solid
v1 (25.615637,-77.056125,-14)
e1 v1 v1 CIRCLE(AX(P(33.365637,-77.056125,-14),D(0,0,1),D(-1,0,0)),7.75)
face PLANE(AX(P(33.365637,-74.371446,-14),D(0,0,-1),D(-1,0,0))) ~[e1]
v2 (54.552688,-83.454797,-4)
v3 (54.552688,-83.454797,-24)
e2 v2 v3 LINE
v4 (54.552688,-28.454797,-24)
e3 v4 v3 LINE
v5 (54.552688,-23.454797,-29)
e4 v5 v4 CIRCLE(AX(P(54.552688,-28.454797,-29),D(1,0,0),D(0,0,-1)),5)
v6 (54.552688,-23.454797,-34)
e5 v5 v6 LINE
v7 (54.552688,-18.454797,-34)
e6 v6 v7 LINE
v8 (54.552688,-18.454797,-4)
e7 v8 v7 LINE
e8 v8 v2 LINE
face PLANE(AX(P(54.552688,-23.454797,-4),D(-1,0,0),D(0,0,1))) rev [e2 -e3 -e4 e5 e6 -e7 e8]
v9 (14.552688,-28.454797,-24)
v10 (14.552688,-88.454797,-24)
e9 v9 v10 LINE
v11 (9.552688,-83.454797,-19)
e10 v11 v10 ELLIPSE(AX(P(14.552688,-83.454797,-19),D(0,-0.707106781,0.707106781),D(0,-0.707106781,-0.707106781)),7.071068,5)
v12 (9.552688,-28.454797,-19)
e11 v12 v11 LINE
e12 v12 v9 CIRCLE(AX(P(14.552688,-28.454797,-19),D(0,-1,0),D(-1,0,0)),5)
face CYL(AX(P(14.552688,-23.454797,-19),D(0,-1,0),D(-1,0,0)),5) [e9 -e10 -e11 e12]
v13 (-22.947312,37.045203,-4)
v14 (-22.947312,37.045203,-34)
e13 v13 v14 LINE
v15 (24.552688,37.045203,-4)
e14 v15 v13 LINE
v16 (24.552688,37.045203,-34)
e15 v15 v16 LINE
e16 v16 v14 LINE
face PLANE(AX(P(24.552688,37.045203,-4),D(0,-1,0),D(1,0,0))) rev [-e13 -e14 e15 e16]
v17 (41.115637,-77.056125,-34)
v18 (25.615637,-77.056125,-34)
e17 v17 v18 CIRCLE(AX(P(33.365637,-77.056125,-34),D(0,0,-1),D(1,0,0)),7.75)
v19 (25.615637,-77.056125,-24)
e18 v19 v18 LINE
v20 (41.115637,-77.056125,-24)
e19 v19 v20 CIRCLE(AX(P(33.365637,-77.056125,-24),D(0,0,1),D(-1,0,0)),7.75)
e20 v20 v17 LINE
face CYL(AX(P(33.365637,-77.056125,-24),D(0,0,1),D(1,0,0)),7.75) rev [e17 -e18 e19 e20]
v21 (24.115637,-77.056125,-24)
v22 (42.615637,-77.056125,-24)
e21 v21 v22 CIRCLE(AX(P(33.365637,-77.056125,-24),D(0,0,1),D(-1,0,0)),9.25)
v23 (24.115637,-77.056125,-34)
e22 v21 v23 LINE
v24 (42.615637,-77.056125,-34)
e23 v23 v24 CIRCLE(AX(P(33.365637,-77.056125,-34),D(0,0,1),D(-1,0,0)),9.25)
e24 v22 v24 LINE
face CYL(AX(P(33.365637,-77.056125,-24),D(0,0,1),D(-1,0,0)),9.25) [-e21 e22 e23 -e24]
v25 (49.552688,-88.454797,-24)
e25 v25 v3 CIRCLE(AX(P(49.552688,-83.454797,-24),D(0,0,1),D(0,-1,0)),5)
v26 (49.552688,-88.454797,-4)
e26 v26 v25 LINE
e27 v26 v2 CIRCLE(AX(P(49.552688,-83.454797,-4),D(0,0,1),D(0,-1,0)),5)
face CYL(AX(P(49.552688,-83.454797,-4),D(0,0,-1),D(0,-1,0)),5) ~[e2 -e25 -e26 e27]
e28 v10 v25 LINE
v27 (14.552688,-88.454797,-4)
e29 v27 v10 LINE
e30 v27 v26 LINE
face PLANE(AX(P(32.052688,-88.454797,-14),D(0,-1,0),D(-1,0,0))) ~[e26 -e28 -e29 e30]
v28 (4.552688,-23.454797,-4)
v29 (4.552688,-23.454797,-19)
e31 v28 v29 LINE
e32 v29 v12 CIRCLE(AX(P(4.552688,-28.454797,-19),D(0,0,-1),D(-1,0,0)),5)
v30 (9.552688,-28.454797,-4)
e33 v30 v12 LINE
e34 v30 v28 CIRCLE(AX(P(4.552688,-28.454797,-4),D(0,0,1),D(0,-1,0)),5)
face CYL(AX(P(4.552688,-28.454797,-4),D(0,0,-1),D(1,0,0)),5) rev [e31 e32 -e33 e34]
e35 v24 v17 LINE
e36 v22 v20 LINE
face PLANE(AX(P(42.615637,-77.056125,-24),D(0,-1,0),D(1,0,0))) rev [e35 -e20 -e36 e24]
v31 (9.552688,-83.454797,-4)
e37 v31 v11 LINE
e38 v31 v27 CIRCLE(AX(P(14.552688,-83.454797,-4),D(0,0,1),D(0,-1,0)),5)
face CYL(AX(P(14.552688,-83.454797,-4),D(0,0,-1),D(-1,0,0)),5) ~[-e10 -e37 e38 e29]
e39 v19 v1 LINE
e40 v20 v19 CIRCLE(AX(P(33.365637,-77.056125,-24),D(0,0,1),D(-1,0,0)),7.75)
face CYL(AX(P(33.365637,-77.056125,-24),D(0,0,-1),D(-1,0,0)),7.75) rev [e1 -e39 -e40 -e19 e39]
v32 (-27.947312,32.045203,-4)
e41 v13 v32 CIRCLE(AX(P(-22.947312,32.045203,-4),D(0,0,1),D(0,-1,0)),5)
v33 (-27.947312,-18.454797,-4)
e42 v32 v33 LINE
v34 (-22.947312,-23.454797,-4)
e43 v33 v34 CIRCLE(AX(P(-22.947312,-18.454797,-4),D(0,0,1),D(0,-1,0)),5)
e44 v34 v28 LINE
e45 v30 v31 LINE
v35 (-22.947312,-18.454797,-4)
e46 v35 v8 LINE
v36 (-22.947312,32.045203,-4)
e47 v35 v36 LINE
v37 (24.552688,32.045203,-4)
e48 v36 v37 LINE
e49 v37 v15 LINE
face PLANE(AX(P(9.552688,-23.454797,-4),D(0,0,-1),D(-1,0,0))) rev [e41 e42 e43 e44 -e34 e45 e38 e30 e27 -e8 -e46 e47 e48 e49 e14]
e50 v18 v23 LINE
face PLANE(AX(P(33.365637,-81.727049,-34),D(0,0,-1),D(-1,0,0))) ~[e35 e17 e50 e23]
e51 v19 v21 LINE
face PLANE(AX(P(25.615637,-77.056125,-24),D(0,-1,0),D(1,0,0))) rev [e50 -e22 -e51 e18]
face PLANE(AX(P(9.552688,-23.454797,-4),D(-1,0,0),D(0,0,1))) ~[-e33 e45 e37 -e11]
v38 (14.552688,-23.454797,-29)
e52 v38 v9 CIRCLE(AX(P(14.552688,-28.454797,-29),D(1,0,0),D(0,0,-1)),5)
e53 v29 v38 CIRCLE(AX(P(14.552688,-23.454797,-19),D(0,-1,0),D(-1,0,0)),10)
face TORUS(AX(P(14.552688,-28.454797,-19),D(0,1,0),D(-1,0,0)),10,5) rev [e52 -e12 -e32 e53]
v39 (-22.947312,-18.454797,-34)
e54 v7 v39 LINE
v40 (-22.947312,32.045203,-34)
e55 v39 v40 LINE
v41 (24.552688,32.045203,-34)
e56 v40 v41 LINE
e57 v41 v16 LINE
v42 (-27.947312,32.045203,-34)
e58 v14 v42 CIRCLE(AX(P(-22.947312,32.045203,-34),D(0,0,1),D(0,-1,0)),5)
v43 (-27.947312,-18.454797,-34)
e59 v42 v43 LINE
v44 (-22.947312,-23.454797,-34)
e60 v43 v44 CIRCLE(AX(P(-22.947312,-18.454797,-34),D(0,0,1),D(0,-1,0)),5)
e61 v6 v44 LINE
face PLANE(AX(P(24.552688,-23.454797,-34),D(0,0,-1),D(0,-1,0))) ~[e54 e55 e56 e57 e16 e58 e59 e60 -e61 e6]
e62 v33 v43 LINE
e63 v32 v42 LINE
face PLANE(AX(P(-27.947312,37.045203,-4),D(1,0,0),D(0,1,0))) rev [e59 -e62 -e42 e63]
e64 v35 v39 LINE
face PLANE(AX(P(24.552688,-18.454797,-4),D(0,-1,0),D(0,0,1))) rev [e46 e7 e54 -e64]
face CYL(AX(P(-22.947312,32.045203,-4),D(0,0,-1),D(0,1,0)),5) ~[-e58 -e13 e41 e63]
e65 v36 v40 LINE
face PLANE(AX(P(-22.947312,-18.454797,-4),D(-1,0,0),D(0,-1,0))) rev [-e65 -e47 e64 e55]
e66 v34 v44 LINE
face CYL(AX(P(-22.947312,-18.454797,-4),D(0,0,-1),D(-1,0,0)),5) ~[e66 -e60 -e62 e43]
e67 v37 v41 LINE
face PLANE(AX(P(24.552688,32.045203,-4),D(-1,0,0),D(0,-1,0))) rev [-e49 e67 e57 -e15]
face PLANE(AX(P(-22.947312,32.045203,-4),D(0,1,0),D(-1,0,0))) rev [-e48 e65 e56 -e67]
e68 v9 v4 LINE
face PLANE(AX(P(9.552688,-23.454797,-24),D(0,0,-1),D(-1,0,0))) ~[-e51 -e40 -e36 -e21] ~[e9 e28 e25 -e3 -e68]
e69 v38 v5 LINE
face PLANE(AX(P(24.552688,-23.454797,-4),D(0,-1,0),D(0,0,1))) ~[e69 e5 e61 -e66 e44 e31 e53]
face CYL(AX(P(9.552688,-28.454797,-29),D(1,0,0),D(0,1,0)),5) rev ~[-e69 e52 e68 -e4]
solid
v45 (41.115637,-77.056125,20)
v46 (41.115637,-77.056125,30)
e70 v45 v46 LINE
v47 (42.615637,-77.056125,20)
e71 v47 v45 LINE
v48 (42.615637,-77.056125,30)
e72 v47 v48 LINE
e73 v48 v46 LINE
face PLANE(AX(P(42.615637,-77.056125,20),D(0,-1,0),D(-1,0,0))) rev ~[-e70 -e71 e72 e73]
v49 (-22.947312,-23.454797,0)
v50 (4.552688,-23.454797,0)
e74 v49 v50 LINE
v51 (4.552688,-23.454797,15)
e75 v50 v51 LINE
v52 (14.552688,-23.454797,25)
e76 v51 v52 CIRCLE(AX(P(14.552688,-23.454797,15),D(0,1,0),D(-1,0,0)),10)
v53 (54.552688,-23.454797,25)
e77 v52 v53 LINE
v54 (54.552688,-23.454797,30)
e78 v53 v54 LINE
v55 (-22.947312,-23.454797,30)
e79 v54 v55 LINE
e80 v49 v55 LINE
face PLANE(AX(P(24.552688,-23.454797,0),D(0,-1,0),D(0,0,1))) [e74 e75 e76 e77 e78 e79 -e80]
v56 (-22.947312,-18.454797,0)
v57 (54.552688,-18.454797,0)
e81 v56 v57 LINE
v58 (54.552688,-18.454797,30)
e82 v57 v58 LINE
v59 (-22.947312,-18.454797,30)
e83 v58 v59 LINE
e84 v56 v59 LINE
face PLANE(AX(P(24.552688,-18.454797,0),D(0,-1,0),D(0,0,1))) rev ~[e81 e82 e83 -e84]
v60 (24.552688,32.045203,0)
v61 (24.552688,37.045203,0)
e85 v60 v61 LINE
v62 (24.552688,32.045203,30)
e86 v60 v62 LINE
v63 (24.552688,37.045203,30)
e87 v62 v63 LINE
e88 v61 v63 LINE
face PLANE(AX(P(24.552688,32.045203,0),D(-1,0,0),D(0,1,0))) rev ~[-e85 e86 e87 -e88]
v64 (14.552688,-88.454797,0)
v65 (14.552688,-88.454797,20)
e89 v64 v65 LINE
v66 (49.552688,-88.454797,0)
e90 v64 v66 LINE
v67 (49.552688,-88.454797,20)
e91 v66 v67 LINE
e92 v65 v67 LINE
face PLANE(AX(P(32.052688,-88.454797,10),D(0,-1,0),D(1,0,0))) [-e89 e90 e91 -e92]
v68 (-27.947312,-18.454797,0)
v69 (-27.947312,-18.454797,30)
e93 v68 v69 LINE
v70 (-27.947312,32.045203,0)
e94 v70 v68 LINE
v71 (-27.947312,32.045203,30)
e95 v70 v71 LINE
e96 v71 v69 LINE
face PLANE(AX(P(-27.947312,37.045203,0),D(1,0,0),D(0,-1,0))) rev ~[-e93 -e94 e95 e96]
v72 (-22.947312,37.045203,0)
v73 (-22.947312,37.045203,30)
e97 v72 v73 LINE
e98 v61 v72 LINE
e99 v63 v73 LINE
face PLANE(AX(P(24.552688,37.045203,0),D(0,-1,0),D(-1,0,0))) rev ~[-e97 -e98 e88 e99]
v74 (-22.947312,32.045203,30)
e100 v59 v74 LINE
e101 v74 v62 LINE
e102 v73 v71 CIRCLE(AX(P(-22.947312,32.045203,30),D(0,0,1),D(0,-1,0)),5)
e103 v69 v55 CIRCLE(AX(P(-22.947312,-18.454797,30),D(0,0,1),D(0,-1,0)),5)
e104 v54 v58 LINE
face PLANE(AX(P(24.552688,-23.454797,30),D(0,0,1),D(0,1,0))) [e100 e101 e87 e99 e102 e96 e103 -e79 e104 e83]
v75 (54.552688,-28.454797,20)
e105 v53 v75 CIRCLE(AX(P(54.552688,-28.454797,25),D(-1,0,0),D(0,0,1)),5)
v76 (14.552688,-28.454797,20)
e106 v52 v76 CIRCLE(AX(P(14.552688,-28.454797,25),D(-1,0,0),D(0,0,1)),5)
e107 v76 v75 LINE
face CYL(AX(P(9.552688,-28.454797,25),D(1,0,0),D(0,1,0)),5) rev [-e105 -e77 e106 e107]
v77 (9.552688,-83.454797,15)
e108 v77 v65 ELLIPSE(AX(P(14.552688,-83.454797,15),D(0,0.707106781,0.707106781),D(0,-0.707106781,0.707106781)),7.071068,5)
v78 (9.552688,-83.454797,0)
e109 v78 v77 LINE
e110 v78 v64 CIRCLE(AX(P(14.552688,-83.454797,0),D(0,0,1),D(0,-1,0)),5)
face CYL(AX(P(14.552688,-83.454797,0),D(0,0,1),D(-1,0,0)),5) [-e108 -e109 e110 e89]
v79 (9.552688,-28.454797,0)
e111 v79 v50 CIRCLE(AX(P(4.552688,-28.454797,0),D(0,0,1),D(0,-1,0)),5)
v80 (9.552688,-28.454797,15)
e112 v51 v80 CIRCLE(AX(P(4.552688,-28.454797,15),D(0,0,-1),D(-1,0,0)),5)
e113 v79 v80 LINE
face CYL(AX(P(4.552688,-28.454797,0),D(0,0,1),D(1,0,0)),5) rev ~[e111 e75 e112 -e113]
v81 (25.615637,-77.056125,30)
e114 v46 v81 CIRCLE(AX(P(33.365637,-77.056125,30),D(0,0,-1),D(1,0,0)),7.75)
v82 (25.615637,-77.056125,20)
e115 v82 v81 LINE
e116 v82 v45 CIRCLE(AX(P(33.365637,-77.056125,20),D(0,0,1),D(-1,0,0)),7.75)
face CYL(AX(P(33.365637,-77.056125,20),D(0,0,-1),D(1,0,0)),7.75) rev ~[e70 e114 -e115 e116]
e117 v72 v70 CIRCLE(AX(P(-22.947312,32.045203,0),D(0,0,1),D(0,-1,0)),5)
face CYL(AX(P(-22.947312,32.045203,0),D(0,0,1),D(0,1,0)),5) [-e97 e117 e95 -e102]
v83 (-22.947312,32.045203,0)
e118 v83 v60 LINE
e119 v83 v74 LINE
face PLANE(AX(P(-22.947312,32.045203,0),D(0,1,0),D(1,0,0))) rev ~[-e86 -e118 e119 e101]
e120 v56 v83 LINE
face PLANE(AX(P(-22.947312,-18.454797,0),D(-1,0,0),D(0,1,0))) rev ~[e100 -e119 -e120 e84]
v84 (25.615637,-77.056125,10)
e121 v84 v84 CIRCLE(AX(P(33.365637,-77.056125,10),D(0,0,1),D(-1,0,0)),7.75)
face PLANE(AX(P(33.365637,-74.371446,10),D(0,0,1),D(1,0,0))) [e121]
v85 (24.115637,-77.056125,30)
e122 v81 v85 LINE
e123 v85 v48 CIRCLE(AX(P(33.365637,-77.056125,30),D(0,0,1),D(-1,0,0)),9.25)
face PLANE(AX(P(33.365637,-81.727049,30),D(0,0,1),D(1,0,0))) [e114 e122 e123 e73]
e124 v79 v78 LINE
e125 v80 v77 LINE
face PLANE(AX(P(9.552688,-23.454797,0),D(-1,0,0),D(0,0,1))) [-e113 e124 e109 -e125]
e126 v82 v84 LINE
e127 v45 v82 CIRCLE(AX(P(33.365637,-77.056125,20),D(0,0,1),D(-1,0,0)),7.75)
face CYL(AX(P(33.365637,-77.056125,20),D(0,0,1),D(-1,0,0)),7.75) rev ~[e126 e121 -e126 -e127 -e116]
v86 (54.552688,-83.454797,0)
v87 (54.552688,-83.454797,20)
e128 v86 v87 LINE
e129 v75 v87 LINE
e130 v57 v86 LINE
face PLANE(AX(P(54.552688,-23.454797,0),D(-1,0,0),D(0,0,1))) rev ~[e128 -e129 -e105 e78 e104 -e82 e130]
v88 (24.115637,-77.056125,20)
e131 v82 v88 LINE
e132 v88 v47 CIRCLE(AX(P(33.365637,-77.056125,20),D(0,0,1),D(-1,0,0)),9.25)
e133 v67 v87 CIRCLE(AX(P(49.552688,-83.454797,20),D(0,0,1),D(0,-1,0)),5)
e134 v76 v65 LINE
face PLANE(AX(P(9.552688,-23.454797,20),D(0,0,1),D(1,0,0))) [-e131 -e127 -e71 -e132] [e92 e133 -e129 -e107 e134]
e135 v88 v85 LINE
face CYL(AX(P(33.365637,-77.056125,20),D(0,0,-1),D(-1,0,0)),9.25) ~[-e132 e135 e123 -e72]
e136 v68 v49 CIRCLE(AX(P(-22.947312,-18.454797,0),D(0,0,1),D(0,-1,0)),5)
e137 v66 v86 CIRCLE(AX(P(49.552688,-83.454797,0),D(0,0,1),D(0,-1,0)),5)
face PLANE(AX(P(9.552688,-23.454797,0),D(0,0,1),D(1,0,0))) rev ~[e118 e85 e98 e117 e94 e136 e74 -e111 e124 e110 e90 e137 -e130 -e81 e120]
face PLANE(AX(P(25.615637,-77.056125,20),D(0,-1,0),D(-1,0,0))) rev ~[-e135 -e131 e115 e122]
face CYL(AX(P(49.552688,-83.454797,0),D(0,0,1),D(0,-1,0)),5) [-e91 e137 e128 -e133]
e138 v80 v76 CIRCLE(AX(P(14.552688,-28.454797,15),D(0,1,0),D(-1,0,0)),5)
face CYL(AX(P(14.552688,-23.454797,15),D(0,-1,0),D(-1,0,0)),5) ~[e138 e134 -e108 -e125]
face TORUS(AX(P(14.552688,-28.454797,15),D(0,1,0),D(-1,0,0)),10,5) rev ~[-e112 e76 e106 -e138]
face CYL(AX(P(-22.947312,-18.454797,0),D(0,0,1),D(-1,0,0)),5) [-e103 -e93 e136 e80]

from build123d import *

# Parameters (mm, degrees)
F1_DEPTH  = 30
F2_DEPTH  = 30
F3_W      = 45
F3_H      = 20
F4_DEPTH  = 65
F5_R      = 5
F9_DEPTH  = 10
F10_DEPTH = 10


with BuildPart() as f1:
    # F0 (on Top) → F1 (new body)
    with BuildSketch(Plane.XY):
        Polygon((24.5526876748, 37.0452034771), (-27.9473123252, 37.0452034771), (-27.9473123252, -23.4547965229), (24.5526876748, -23.4547965229), (24.5526876748, -18.4547965229), (19.5526876748, -18.4547965229), (-22.9473123252, -18.4547965229), (-22.9473123252, 32.0452034771), (19.5526876748, 32.0452034771), (24.5526876748, 32.0452034771), align=None)
    extrude(amount=F1_DEPTH)

    # F2 (add): a face of the model
    f2_faces = [f1.faces().sort_by_distance(p)[0] for p in [
        (24.5526876748, -20.9547965229, 15),
    ]]
    extrude(f2_faces, amount=F2_DEPTH)

    # F3 (on face) → F4 (join)
    with BuildSketch(Plane.XZ.offset(23.4547965229)):
        with Locations((32.0526876748, 10)):
            Rectangle(F3_W, F3_H)
    extrude(amount=F4_DEPTH)

    # F5
    f5_edges = [f1.edges().sort_by_distance(p)[0] for p in [
        (-27.947312, -23.454797, 15),
        (9.552688, -55.954797, 20),
        (9.552688, -88.454797, 10),
        (54.552688, -88.454797, 10),
        (-27.947312, 37.045203, 15),
        (9.552688, -23.454797, 10),
        (32.052688, -23.454797, 20),
    ]]
    fillet(f5_edges, radius=F5_R)


with BuildPart() as f7_1:
    # F7: instance of F1
    add(f1.part.mirror(Plane.XY.offset(-2)))


with BuildPart() as f1_1:
    add(f1.part)

    # F8 (on face) → F9 (cut)
    with BuildSketch(Plane.XY.offset(20)):
        with BuildLine():
            Line((33.365637064, -77.0561248064), (41.115637064, -77.0561248064))
            ThreePointArc((41.115637064, -77.0561248064), (33.365637064, -69.3061248064), (25.615637064, -77.0561248064))
            Line((25.615637064, -77.0561248064), (33.365637064, -77.0561248064))
        make_face()
        with BuildLine():
            ThreePointArc((25.615637064, -77.0561248064), (33.365637064, -84.8061248064), (41.115637064, -77.0561248064))
            Line((41.115637064, -77.0561248064), (33.365637064, -77.0561248064))
            Line((33.365637064, -77.0561248064), (25.615637064, -77.0561248064))
        make_face()
    extrude(amount=-F9_DEPTH, mode=Mode.SUBTRACT)

    # F8 (on face) → F10 (join)
    with BuildSketch(Plane.XY.offset(20)):
        with BuildLine():
            Line((42.615637064, -77.0561248064), (41.115637064, -77.0561248064))
            ThreePointArc((41.115637064, -77.0561248064), (33.365637064, -84.8061248064), (25.615637064, -77.0561248064))
            Line((25.615637064, -77.0561248064), (24.115637064, -77.0561248064))
            ThreePointArc((24.115637064, -77.0561248064), (33.365637064, -86.3061248064), (42.615637064, -77.0561248064))
        make_face()
    extrude(amount=F10_DEPTH)


with BuildPart() as f12_1:
    # F12: instance of F1
    add(f1_1.part.mirror(Plane.XY.offset(-2)))


solid = Compound([f1_1.part, f12_1.part])
